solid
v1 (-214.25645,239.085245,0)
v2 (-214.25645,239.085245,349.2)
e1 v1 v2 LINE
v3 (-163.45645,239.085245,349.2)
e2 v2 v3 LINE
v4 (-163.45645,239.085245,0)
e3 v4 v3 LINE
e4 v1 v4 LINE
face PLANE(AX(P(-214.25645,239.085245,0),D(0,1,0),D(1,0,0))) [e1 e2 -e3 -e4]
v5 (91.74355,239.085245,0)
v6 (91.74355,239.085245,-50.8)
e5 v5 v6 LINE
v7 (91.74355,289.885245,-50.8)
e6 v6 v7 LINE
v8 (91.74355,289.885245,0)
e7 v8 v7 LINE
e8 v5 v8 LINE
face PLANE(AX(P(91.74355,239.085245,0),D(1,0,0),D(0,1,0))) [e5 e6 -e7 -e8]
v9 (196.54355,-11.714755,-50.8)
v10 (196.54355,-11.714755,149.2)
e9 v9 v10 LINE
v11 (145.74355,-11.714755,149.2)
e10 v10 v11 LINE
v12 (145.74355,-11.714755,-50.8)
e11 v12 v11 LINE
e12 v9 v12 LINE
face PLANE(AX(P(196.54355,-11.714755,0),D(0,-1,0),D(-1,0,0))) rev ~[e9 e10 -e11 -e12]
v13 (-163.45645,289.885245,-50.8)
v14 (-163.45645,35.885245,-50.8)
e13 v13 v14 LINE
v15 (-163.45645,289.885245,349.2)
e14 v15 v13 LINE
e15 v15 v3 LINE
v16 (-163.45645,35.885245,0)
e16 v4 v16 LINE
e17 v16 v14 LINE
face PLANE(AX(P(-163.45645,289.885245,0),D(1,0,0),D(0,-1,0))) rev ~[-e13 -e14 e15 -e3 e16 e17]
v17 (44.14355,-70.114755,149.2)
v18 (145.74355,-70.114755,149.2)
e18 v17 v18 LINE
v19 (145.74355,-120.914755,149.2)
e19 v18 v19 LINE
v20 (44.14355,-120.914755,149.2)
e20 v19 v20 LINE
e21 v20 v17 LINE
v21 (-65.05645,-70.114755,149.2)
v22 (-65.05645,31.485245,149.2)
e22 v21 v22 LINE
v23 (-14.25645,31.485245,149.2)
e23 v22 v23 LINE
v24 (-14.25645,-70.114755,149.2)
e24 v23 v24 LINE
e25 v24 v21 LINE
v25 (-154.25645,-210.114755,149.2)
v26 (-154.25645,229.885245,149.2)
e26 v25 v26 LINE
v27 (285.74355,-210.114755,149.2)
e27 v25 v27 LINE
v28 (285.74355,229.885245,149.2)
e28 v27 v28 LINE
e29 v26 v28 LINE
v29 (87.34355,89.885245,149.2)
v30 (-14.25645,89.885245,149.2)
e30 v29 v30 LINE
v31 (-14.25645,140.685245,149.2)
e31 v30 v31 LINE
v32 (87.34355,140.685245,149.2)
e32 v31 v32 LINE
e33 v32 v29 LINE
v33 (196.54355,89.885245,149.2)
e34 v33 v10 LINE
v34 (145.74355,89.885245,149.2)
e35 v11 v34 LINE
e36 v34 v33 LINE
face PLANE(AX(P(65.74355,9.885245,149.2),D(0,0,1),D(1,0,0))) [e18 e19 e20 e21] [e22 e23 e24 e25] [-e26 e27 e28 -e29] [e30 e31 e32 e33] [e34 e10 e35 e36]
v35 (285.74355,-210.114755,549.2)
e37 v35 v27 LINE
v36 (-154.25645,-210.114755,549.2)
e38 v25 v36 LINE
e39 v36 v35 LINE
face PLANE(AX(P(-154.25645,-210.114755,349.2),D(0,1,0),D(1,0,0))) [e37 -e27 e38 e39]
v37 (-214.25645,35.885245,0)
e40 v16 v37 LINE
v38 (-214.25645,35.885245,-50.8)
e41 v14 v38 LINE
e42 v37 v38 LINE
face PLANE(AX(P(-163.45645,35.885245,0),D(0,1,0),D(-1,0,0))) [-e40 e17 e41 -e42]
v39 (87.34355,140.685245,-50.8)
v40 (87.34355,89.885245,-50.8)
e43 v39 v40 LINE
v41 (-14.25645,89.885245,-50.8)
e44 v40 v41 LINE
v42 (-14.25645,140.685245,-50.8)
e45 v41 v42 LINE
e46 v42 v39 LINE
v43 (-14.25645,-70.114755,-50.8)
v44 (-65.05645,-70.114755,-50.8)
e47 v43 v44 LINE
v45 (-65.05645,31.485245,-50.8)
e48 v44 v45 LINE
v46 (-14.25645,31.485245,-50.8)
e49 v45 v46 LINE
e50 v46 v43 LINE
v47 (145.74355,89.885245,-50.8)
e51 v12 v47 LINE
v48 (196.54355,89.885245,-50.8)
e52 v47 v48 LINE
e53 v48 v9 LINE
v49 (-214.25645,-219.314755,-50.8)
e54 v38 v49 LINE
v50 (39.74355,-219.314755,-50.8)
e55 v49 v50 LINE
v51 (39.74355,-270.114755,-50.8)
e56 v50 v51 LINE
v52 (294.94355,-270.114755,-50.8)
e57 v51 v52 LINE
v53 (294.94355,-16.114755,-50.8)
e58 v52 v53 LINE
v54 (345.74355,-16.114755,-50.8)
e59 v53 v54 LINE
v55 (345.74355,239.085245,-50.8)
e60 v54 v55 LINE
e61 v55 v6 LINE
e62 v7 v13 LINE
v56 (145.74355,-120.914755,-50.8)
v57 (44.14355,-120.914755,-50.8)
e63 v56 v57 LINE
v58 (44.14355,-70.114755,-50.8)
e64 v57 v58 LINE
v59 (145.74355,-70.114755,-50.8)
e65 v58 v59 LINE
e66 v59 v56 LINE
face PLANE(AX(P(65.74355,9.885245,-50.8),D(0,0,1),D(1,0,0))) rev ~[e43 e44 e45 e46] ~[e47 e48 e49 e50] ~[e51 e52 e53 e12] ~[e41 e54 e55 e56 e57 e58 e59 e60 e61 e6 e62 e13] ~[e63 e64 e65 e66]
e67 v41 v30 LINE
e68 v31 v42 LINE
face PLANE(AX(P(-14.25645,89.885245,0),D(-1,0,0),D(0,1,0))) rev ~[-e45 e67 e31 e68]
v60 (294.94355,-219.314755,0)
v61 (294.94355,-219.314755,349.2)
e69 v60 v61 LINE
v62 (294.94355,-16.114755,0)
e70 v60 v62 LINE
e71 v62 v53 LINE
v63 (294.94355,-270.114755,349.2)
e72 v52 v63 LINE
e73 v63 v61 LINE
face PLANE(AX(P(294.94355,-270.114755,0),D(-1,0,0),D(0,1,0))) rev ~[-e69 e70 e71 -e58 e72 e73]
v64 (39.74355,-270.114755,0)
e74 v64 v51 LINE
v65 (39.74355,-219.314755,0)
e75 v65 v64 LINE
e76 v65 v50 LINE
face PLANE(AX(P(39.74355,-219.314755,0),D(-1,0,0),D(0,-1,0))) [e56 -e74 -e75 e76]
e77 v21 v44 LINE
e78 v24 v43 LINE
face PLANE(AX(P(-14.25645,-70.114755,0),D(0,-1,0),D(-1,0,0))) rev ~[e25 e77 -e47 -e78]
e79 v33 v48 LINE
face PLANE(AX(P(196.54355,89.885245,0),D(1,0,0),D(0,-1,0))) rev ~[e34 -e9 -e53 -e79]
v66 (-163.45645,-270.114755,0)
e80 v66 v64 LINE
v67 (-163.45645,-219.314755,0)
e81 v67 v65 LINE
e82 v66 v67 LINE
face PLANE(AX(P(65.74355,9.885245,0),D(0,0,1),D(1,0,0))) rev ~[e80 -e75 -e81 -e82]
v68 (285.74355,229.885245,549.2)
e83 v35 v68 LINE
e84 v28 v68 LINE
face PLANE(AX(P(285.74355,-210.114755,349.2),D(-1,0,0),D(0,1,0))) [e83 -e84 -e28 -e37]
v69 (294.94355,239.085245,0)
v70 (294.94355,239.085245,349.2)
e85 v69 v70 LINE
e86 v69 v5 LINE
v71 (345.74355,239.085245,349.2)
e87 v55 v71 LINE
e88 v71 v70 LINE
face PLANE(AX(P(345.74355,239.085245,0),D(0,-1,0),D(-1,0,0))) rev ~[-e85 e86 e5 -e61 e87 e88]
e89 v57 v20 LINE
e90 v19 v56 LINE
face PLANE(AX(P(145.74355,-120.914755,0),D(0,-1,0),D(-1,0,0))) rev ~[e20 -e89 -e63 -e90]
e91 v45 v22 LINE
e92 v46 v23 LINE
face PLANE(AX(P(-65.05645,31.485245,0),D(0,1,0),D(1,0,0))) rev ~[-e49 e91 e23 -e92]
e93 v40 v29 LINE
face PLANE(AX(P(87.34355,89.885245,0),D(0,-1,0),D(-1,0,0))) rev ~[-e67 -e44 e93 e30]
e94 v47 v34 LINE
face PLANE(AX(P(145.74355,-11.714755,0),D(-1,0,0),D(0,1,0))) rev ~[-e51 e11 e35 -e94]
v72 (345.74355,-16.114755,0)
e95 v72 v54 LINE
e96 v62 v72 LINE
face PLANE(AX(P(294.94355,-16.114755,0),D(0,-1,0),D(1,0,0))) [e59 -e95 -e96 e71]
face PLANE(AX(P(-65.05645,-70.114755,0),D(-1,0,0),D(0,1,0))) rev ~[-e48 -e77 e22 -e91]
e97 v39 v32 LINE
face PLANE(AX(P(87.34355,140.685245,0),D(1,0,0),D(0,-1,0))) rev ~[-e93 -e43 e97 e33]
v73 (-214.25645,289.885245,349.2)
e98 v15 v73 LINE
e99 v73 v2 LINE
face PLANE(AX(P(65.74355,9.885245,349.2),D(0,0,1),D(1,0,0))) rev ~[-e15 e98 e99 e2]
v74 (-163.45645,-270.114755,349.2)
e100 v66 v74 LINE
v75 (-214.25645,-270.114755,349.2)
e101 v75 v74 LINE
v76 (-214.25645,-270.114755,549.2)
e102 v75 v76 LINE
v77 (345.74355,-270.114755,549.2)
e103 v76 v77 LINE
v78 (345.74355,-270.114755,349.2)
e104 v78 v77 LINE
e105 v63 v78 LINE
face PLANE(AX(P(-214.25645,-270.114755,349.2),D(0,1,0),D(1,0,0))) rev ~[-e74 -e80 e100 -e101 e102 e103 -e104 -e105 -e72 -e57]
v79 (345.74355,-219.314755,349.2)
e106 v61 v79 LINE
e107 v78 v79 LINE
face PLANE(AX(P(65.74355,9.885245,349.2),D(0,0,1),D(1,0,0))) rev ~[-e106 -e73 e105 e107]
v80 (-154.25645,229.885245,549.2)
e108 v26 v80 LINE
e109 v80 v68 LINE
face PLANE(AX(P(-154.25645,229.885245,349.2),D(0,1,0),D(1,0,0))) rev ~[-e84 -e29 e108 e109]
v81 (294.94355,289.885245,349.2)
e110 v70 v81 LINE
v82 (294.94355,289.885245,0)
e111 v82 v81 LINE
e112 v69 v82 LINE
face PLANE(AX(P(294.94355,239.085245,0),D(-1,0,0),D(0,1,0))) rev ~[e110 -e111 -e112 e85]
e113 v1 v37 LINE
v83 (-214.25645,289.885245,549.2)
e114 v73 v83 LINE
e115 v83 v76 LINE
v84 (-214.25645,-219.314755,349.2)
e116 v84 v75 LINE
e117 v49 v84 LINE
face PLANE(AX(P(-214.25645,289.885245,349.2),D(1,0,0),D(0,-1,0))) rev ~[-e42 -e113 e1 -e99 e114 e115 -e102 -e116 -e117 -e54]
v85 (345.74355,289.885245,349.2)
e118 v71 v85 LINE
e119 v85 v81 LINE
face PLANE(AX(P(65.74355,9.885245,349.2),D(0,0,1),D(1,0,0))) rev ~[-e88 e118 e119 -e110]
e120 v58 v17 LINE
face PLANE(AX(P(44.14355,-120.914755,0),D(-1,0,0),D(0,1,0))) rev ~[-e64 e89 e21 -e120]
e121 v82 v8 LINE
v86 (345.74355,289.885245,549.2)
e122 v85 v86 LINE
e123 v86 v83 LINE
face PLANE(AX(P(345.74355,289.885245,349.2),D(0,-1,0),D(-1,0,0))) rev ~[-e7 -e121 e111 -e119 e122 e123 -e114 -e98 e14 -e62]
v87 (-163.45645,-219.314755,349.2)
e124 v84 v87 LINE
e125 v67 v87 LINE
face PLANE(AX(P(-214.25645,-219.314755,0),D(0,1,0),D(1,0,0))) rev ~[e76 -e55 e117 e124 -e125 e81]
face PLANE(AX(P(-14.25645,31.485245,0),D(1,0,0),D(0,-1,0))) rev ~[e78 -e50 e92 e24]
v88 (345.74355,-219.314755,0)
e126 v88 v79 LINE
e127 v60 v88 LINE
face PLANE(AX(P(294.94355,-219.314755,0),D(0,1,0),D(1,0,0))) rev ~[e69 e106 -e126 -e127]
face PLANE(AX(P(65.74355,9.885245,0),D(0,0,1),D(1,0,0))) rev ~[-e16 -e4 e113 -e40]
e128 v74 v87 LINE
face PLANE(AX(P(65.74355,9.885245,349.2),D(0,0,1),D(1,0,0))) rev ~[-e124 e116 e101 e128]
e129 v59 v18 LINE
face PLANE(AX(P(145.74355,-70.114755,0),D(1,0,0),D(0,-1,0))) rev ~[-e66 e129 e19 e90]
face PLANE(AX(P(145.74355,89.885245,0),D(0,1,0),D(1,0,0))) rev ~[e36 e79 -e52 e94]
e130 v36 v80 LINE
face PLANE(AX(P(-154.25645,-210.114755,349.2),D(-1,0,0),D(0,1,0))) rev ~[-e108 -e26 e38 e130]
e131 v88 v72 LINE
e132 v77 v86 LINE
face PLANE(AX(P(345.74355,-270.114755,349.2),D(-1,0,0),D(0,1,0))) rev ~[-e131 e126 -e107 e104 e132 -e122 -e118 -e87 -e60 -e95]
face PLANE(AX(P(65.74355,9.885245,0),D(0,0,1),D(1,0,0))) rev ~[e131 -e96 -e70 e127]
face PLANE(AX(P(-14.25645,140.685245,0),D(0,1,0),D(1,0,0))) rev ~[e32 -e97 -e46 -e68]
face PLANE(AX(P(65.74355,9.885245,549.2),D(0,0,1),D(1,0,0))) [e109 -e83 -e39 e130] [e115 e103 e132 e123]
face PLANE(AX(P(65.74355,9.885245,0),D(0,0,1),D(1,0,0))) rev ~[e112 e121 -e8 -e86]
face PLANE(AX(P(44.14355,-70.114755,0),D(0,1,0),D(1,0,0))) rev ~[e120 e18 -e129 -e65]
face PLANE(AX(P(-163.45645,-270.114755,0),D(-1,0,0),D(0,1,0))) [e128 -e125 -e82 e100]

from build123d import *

# Parameters (mm, degrees)
F0_W     = 440
F0_H     = 440
F1_DEPTH = 50.8
F0_W_2   = 50.8
F0_H_2   = 203.2
F0_W_3   = 203.2
F0_H_3   = 50.8
F2_DEPTH = 349.2
F3_DEPTH = 149.2
F4_W     = 440
F4_H     = 440
F4_W_2   = 50.8
F4_H_2   = 50.8
F5_DEPTH = 200


# Not quite as in the source:
# - a feature names something its author has since deleted; it is built from what else it names


with BuildPart() as f1:
    # F0 (on Top) → F1 (new body)
    with BuildSketch(Plane.XY):
        Polygon((91.7435496044, 289.8852448295), (-163.4564503956, 289.8852448295), (-163.4564503956, 239.0852448295), (-163.4564503956, 35.8852448295), (-214.2564503956, 35.8852448295), (-214.2564503956, -219.3147551705), (-163.4564503956, -219.3147551705), (39.7435496044, -219.3147551705), (39.7435496044, -270.1147551705), (294.9435496044, -270.1147551705), (294.9435496044, -219.3147551705), (294.9435496044, -16.1147551705), (345.7435496044, -16.1147551705), (345.7435496044, 239.0852448295), (294.9435496044, 239.0852448295), (91.7435496044, 239.0852448295), align=None)
        with Locations((65.7435496044, 9.8852448295)):
            Rectangle(F0_W, F0_H, mode=Mode.SUBTRACT)
        with Locations((65.7435496044, 9.8852448295)):
            Rectangle(F0_W, F0_H)
        Polygon((-65.0564503956, 140.6852448295), (-14.2564503956, 140.6852448295), (87.3435496044, 140.6852448295), (196.5435496044, 140.6852448295), (196.5435496044, 89.8852448295), (196.5435496044, -11.7147551705), (196.5435496044, -120.9147551705), (145.7435496044, -120.9147551705), (44.1435496044, -120.9147551705), (-65.0564503956, -120.9147551705), (-65.0564503956, -70.1147551705), (-65.0564503956, 31.4852448295), align=None, mode=Mode.SUBTRACT)
        Polygon((87.3435496044, 89.8852448295), (-14.2564503956, 89.8852448295), (-14.2564503956, 140.6852448295), (-65.0564503956, 140.6852448295), (-65.0564503956, 31.4852448295), (-14.2564503956, 31.4852448295), (-14.2564503956, -70.1147551705), (-65.0564503956, -70.1147551705), (-65.0564503956, -120.9147551705), (44.1435496044, -120.9147551705), (44.1435496044, -70.1147551705), (145.7435496044, -70.1147551705), (145.7435496044, -120.9147551705), (196.5435496044, -120.9147551705), (196.5435496044, -11.7147551705), (145.7435496044, -11.7147551705), (145.7435496044, 89.8852448295), (196.5435496044, 89.8852448295), (196.5435496044, 140.6852448295), (87.3435496044, 140.6852448295), align=None)
    extrude(amount=-F1_DEPTH)

    # F0 (on Top) → F2 (join)
    with BuildSketch(Plane.XY):
        Polygon((91.7435496044, 289.8852448295), (-163.4564503956, 289.8852448295), (-163.4564503956, 239.0852448295), (-163.4564503956, 35.8852448295), (-214.2564503956, 35.8852448295), (-214.2564503956, -219.3147551705), (-163.4564503956, -219.3147551705), (39.7435496044, -219.3147551705), (39.7435496044, -270.1147551705), (294.9435496044, -270.1147551705), (294.9435496044, -219.3147551705), (294.9435496044, -16.1147551705), (345.7435496044, -16.1147551705), (345.7435496044, 239.0852448295), (294.9435496044, 239.0852448295), (91.7435496044, 239.0852448295), align=None)
        with Locations((65.7435496044, 9.8852448295)):
            Rectangle(F0_W, F0_H, mode=Mode.SUBTRACT)
        with Locations((320.3435496044, -117.7147551705)):
            Rectangle(F0_W_2, F0_H_2)
        with Locations((193.3435496044, 264.4852448295)):
            Rectangle(F0_W_3, F0_H_3)
        with Locations((-188.8564503956, 137.4852448295)):
            Rectangle(F0_W_2, F0_H_2)
        with Locations((-61.8564503956, -244.7147551705)):
            Rectangle(F0_W_3, F0_H_3)
    extrude(amount=F2_DEPTH)

    # F0 (on Top) → F3 (join)
    with BuildSketch(Plane.XY):
        with Locations((65.7435496044, 9.8852448295)):
            Rectangle(F0_W, F0_H)
        Polygon((-65.0564503956, 140.6852448295), (-14.2564503956, 140.6852448295), (87.3435496044, 140.6852448295), (196.5435496044, 140.6852448295), (196.5435496044, 89.8852448295), (196.5435496044, -11.7147551705), (196.5435496044, -120.9147551705), (145.7435496044, -120.9147551705), (44.1435496044, -120.9147551705), (-65.0564503956, -120.9147551705), (-65.0564503956, -70.1147551705), (-65.0564503956, 31.4852448295), align=None, mode=Mode.SUBTRACT)
        Polygon((87.3435496044, 89.8852448295), (-14.2564503956, 89.8852448295), (-14.2564503956, 140.6852448295), (-65.0564503956, 140.6852448295), (-65.0564503956, 31.4852448295), (-14.2564503956, 31.4852448295), (-14.2564503956, -70.1147551705), (-65.0564503956, -70.1147551705), (-65.0564503956, -120.9147551705), (44.1435496044, -120.9147551705), (44.1435496044, -70.1147551705), (145.7435496044, -70.1147551705), (145.7435496044, -120.9147551705), (196.5435496044, -120.9147551705), (196.5435496044, -11.7147551705), (145.7435496044, -11.7147551705), (145.7435496044, 89.8852448295), (196.5435496044, 89.8852448295), (196.5435496044, 140.6852448295), (87.3435496044, 140.6852448295), align=None)
    extrude(amount=F3_DEPTH)

    # F4 (on face) → F5 (join)
    with BuildSketch(Plane.XY.offset(349.2)):
        Polygon((-163.4564503956, -219.3147551705), (-163.4564503956, -270.1147551705), (294.9435496044, -270.1147551705), (294.9435496044, -219.3147551705), (345.7435496044, -219.3147551705), (345.7435496044, 239.0852448295), (294.9435496044, 239.0852448295), (294.9435496044, 289.8852448295), (-163.4564503956, 289.8852448295), (-163.4564503956, 239.0852448295), (-214.2564503956, 239.0852448295), (-214.2564503956, -219.3147551705), align=None)
        with Locations((65.7435496044, 9.8852448295)):
            Rectangle(F4_W, F4_H, mode=Mode.SUBTRACT)
        with Locations((-188.8564503956, -244.7147551705)):
            Rectangle(F4_W_2, F4_H_2)
        with Locations((320.3435496044, 264.4852448295)):
            Rectangle(F4_W_2, F4_H_2)
        with Locations((-188.8564503956, 264.4852448295)):
            Rectangle(F4_W_2, F4_H_2)
        with Locations((320.3435496044, -244.7147551705)):
            Rectangle(F4_W_2, F4_H_2)
    extrude(amount=F5_DEPTH)


solid = f1.part
